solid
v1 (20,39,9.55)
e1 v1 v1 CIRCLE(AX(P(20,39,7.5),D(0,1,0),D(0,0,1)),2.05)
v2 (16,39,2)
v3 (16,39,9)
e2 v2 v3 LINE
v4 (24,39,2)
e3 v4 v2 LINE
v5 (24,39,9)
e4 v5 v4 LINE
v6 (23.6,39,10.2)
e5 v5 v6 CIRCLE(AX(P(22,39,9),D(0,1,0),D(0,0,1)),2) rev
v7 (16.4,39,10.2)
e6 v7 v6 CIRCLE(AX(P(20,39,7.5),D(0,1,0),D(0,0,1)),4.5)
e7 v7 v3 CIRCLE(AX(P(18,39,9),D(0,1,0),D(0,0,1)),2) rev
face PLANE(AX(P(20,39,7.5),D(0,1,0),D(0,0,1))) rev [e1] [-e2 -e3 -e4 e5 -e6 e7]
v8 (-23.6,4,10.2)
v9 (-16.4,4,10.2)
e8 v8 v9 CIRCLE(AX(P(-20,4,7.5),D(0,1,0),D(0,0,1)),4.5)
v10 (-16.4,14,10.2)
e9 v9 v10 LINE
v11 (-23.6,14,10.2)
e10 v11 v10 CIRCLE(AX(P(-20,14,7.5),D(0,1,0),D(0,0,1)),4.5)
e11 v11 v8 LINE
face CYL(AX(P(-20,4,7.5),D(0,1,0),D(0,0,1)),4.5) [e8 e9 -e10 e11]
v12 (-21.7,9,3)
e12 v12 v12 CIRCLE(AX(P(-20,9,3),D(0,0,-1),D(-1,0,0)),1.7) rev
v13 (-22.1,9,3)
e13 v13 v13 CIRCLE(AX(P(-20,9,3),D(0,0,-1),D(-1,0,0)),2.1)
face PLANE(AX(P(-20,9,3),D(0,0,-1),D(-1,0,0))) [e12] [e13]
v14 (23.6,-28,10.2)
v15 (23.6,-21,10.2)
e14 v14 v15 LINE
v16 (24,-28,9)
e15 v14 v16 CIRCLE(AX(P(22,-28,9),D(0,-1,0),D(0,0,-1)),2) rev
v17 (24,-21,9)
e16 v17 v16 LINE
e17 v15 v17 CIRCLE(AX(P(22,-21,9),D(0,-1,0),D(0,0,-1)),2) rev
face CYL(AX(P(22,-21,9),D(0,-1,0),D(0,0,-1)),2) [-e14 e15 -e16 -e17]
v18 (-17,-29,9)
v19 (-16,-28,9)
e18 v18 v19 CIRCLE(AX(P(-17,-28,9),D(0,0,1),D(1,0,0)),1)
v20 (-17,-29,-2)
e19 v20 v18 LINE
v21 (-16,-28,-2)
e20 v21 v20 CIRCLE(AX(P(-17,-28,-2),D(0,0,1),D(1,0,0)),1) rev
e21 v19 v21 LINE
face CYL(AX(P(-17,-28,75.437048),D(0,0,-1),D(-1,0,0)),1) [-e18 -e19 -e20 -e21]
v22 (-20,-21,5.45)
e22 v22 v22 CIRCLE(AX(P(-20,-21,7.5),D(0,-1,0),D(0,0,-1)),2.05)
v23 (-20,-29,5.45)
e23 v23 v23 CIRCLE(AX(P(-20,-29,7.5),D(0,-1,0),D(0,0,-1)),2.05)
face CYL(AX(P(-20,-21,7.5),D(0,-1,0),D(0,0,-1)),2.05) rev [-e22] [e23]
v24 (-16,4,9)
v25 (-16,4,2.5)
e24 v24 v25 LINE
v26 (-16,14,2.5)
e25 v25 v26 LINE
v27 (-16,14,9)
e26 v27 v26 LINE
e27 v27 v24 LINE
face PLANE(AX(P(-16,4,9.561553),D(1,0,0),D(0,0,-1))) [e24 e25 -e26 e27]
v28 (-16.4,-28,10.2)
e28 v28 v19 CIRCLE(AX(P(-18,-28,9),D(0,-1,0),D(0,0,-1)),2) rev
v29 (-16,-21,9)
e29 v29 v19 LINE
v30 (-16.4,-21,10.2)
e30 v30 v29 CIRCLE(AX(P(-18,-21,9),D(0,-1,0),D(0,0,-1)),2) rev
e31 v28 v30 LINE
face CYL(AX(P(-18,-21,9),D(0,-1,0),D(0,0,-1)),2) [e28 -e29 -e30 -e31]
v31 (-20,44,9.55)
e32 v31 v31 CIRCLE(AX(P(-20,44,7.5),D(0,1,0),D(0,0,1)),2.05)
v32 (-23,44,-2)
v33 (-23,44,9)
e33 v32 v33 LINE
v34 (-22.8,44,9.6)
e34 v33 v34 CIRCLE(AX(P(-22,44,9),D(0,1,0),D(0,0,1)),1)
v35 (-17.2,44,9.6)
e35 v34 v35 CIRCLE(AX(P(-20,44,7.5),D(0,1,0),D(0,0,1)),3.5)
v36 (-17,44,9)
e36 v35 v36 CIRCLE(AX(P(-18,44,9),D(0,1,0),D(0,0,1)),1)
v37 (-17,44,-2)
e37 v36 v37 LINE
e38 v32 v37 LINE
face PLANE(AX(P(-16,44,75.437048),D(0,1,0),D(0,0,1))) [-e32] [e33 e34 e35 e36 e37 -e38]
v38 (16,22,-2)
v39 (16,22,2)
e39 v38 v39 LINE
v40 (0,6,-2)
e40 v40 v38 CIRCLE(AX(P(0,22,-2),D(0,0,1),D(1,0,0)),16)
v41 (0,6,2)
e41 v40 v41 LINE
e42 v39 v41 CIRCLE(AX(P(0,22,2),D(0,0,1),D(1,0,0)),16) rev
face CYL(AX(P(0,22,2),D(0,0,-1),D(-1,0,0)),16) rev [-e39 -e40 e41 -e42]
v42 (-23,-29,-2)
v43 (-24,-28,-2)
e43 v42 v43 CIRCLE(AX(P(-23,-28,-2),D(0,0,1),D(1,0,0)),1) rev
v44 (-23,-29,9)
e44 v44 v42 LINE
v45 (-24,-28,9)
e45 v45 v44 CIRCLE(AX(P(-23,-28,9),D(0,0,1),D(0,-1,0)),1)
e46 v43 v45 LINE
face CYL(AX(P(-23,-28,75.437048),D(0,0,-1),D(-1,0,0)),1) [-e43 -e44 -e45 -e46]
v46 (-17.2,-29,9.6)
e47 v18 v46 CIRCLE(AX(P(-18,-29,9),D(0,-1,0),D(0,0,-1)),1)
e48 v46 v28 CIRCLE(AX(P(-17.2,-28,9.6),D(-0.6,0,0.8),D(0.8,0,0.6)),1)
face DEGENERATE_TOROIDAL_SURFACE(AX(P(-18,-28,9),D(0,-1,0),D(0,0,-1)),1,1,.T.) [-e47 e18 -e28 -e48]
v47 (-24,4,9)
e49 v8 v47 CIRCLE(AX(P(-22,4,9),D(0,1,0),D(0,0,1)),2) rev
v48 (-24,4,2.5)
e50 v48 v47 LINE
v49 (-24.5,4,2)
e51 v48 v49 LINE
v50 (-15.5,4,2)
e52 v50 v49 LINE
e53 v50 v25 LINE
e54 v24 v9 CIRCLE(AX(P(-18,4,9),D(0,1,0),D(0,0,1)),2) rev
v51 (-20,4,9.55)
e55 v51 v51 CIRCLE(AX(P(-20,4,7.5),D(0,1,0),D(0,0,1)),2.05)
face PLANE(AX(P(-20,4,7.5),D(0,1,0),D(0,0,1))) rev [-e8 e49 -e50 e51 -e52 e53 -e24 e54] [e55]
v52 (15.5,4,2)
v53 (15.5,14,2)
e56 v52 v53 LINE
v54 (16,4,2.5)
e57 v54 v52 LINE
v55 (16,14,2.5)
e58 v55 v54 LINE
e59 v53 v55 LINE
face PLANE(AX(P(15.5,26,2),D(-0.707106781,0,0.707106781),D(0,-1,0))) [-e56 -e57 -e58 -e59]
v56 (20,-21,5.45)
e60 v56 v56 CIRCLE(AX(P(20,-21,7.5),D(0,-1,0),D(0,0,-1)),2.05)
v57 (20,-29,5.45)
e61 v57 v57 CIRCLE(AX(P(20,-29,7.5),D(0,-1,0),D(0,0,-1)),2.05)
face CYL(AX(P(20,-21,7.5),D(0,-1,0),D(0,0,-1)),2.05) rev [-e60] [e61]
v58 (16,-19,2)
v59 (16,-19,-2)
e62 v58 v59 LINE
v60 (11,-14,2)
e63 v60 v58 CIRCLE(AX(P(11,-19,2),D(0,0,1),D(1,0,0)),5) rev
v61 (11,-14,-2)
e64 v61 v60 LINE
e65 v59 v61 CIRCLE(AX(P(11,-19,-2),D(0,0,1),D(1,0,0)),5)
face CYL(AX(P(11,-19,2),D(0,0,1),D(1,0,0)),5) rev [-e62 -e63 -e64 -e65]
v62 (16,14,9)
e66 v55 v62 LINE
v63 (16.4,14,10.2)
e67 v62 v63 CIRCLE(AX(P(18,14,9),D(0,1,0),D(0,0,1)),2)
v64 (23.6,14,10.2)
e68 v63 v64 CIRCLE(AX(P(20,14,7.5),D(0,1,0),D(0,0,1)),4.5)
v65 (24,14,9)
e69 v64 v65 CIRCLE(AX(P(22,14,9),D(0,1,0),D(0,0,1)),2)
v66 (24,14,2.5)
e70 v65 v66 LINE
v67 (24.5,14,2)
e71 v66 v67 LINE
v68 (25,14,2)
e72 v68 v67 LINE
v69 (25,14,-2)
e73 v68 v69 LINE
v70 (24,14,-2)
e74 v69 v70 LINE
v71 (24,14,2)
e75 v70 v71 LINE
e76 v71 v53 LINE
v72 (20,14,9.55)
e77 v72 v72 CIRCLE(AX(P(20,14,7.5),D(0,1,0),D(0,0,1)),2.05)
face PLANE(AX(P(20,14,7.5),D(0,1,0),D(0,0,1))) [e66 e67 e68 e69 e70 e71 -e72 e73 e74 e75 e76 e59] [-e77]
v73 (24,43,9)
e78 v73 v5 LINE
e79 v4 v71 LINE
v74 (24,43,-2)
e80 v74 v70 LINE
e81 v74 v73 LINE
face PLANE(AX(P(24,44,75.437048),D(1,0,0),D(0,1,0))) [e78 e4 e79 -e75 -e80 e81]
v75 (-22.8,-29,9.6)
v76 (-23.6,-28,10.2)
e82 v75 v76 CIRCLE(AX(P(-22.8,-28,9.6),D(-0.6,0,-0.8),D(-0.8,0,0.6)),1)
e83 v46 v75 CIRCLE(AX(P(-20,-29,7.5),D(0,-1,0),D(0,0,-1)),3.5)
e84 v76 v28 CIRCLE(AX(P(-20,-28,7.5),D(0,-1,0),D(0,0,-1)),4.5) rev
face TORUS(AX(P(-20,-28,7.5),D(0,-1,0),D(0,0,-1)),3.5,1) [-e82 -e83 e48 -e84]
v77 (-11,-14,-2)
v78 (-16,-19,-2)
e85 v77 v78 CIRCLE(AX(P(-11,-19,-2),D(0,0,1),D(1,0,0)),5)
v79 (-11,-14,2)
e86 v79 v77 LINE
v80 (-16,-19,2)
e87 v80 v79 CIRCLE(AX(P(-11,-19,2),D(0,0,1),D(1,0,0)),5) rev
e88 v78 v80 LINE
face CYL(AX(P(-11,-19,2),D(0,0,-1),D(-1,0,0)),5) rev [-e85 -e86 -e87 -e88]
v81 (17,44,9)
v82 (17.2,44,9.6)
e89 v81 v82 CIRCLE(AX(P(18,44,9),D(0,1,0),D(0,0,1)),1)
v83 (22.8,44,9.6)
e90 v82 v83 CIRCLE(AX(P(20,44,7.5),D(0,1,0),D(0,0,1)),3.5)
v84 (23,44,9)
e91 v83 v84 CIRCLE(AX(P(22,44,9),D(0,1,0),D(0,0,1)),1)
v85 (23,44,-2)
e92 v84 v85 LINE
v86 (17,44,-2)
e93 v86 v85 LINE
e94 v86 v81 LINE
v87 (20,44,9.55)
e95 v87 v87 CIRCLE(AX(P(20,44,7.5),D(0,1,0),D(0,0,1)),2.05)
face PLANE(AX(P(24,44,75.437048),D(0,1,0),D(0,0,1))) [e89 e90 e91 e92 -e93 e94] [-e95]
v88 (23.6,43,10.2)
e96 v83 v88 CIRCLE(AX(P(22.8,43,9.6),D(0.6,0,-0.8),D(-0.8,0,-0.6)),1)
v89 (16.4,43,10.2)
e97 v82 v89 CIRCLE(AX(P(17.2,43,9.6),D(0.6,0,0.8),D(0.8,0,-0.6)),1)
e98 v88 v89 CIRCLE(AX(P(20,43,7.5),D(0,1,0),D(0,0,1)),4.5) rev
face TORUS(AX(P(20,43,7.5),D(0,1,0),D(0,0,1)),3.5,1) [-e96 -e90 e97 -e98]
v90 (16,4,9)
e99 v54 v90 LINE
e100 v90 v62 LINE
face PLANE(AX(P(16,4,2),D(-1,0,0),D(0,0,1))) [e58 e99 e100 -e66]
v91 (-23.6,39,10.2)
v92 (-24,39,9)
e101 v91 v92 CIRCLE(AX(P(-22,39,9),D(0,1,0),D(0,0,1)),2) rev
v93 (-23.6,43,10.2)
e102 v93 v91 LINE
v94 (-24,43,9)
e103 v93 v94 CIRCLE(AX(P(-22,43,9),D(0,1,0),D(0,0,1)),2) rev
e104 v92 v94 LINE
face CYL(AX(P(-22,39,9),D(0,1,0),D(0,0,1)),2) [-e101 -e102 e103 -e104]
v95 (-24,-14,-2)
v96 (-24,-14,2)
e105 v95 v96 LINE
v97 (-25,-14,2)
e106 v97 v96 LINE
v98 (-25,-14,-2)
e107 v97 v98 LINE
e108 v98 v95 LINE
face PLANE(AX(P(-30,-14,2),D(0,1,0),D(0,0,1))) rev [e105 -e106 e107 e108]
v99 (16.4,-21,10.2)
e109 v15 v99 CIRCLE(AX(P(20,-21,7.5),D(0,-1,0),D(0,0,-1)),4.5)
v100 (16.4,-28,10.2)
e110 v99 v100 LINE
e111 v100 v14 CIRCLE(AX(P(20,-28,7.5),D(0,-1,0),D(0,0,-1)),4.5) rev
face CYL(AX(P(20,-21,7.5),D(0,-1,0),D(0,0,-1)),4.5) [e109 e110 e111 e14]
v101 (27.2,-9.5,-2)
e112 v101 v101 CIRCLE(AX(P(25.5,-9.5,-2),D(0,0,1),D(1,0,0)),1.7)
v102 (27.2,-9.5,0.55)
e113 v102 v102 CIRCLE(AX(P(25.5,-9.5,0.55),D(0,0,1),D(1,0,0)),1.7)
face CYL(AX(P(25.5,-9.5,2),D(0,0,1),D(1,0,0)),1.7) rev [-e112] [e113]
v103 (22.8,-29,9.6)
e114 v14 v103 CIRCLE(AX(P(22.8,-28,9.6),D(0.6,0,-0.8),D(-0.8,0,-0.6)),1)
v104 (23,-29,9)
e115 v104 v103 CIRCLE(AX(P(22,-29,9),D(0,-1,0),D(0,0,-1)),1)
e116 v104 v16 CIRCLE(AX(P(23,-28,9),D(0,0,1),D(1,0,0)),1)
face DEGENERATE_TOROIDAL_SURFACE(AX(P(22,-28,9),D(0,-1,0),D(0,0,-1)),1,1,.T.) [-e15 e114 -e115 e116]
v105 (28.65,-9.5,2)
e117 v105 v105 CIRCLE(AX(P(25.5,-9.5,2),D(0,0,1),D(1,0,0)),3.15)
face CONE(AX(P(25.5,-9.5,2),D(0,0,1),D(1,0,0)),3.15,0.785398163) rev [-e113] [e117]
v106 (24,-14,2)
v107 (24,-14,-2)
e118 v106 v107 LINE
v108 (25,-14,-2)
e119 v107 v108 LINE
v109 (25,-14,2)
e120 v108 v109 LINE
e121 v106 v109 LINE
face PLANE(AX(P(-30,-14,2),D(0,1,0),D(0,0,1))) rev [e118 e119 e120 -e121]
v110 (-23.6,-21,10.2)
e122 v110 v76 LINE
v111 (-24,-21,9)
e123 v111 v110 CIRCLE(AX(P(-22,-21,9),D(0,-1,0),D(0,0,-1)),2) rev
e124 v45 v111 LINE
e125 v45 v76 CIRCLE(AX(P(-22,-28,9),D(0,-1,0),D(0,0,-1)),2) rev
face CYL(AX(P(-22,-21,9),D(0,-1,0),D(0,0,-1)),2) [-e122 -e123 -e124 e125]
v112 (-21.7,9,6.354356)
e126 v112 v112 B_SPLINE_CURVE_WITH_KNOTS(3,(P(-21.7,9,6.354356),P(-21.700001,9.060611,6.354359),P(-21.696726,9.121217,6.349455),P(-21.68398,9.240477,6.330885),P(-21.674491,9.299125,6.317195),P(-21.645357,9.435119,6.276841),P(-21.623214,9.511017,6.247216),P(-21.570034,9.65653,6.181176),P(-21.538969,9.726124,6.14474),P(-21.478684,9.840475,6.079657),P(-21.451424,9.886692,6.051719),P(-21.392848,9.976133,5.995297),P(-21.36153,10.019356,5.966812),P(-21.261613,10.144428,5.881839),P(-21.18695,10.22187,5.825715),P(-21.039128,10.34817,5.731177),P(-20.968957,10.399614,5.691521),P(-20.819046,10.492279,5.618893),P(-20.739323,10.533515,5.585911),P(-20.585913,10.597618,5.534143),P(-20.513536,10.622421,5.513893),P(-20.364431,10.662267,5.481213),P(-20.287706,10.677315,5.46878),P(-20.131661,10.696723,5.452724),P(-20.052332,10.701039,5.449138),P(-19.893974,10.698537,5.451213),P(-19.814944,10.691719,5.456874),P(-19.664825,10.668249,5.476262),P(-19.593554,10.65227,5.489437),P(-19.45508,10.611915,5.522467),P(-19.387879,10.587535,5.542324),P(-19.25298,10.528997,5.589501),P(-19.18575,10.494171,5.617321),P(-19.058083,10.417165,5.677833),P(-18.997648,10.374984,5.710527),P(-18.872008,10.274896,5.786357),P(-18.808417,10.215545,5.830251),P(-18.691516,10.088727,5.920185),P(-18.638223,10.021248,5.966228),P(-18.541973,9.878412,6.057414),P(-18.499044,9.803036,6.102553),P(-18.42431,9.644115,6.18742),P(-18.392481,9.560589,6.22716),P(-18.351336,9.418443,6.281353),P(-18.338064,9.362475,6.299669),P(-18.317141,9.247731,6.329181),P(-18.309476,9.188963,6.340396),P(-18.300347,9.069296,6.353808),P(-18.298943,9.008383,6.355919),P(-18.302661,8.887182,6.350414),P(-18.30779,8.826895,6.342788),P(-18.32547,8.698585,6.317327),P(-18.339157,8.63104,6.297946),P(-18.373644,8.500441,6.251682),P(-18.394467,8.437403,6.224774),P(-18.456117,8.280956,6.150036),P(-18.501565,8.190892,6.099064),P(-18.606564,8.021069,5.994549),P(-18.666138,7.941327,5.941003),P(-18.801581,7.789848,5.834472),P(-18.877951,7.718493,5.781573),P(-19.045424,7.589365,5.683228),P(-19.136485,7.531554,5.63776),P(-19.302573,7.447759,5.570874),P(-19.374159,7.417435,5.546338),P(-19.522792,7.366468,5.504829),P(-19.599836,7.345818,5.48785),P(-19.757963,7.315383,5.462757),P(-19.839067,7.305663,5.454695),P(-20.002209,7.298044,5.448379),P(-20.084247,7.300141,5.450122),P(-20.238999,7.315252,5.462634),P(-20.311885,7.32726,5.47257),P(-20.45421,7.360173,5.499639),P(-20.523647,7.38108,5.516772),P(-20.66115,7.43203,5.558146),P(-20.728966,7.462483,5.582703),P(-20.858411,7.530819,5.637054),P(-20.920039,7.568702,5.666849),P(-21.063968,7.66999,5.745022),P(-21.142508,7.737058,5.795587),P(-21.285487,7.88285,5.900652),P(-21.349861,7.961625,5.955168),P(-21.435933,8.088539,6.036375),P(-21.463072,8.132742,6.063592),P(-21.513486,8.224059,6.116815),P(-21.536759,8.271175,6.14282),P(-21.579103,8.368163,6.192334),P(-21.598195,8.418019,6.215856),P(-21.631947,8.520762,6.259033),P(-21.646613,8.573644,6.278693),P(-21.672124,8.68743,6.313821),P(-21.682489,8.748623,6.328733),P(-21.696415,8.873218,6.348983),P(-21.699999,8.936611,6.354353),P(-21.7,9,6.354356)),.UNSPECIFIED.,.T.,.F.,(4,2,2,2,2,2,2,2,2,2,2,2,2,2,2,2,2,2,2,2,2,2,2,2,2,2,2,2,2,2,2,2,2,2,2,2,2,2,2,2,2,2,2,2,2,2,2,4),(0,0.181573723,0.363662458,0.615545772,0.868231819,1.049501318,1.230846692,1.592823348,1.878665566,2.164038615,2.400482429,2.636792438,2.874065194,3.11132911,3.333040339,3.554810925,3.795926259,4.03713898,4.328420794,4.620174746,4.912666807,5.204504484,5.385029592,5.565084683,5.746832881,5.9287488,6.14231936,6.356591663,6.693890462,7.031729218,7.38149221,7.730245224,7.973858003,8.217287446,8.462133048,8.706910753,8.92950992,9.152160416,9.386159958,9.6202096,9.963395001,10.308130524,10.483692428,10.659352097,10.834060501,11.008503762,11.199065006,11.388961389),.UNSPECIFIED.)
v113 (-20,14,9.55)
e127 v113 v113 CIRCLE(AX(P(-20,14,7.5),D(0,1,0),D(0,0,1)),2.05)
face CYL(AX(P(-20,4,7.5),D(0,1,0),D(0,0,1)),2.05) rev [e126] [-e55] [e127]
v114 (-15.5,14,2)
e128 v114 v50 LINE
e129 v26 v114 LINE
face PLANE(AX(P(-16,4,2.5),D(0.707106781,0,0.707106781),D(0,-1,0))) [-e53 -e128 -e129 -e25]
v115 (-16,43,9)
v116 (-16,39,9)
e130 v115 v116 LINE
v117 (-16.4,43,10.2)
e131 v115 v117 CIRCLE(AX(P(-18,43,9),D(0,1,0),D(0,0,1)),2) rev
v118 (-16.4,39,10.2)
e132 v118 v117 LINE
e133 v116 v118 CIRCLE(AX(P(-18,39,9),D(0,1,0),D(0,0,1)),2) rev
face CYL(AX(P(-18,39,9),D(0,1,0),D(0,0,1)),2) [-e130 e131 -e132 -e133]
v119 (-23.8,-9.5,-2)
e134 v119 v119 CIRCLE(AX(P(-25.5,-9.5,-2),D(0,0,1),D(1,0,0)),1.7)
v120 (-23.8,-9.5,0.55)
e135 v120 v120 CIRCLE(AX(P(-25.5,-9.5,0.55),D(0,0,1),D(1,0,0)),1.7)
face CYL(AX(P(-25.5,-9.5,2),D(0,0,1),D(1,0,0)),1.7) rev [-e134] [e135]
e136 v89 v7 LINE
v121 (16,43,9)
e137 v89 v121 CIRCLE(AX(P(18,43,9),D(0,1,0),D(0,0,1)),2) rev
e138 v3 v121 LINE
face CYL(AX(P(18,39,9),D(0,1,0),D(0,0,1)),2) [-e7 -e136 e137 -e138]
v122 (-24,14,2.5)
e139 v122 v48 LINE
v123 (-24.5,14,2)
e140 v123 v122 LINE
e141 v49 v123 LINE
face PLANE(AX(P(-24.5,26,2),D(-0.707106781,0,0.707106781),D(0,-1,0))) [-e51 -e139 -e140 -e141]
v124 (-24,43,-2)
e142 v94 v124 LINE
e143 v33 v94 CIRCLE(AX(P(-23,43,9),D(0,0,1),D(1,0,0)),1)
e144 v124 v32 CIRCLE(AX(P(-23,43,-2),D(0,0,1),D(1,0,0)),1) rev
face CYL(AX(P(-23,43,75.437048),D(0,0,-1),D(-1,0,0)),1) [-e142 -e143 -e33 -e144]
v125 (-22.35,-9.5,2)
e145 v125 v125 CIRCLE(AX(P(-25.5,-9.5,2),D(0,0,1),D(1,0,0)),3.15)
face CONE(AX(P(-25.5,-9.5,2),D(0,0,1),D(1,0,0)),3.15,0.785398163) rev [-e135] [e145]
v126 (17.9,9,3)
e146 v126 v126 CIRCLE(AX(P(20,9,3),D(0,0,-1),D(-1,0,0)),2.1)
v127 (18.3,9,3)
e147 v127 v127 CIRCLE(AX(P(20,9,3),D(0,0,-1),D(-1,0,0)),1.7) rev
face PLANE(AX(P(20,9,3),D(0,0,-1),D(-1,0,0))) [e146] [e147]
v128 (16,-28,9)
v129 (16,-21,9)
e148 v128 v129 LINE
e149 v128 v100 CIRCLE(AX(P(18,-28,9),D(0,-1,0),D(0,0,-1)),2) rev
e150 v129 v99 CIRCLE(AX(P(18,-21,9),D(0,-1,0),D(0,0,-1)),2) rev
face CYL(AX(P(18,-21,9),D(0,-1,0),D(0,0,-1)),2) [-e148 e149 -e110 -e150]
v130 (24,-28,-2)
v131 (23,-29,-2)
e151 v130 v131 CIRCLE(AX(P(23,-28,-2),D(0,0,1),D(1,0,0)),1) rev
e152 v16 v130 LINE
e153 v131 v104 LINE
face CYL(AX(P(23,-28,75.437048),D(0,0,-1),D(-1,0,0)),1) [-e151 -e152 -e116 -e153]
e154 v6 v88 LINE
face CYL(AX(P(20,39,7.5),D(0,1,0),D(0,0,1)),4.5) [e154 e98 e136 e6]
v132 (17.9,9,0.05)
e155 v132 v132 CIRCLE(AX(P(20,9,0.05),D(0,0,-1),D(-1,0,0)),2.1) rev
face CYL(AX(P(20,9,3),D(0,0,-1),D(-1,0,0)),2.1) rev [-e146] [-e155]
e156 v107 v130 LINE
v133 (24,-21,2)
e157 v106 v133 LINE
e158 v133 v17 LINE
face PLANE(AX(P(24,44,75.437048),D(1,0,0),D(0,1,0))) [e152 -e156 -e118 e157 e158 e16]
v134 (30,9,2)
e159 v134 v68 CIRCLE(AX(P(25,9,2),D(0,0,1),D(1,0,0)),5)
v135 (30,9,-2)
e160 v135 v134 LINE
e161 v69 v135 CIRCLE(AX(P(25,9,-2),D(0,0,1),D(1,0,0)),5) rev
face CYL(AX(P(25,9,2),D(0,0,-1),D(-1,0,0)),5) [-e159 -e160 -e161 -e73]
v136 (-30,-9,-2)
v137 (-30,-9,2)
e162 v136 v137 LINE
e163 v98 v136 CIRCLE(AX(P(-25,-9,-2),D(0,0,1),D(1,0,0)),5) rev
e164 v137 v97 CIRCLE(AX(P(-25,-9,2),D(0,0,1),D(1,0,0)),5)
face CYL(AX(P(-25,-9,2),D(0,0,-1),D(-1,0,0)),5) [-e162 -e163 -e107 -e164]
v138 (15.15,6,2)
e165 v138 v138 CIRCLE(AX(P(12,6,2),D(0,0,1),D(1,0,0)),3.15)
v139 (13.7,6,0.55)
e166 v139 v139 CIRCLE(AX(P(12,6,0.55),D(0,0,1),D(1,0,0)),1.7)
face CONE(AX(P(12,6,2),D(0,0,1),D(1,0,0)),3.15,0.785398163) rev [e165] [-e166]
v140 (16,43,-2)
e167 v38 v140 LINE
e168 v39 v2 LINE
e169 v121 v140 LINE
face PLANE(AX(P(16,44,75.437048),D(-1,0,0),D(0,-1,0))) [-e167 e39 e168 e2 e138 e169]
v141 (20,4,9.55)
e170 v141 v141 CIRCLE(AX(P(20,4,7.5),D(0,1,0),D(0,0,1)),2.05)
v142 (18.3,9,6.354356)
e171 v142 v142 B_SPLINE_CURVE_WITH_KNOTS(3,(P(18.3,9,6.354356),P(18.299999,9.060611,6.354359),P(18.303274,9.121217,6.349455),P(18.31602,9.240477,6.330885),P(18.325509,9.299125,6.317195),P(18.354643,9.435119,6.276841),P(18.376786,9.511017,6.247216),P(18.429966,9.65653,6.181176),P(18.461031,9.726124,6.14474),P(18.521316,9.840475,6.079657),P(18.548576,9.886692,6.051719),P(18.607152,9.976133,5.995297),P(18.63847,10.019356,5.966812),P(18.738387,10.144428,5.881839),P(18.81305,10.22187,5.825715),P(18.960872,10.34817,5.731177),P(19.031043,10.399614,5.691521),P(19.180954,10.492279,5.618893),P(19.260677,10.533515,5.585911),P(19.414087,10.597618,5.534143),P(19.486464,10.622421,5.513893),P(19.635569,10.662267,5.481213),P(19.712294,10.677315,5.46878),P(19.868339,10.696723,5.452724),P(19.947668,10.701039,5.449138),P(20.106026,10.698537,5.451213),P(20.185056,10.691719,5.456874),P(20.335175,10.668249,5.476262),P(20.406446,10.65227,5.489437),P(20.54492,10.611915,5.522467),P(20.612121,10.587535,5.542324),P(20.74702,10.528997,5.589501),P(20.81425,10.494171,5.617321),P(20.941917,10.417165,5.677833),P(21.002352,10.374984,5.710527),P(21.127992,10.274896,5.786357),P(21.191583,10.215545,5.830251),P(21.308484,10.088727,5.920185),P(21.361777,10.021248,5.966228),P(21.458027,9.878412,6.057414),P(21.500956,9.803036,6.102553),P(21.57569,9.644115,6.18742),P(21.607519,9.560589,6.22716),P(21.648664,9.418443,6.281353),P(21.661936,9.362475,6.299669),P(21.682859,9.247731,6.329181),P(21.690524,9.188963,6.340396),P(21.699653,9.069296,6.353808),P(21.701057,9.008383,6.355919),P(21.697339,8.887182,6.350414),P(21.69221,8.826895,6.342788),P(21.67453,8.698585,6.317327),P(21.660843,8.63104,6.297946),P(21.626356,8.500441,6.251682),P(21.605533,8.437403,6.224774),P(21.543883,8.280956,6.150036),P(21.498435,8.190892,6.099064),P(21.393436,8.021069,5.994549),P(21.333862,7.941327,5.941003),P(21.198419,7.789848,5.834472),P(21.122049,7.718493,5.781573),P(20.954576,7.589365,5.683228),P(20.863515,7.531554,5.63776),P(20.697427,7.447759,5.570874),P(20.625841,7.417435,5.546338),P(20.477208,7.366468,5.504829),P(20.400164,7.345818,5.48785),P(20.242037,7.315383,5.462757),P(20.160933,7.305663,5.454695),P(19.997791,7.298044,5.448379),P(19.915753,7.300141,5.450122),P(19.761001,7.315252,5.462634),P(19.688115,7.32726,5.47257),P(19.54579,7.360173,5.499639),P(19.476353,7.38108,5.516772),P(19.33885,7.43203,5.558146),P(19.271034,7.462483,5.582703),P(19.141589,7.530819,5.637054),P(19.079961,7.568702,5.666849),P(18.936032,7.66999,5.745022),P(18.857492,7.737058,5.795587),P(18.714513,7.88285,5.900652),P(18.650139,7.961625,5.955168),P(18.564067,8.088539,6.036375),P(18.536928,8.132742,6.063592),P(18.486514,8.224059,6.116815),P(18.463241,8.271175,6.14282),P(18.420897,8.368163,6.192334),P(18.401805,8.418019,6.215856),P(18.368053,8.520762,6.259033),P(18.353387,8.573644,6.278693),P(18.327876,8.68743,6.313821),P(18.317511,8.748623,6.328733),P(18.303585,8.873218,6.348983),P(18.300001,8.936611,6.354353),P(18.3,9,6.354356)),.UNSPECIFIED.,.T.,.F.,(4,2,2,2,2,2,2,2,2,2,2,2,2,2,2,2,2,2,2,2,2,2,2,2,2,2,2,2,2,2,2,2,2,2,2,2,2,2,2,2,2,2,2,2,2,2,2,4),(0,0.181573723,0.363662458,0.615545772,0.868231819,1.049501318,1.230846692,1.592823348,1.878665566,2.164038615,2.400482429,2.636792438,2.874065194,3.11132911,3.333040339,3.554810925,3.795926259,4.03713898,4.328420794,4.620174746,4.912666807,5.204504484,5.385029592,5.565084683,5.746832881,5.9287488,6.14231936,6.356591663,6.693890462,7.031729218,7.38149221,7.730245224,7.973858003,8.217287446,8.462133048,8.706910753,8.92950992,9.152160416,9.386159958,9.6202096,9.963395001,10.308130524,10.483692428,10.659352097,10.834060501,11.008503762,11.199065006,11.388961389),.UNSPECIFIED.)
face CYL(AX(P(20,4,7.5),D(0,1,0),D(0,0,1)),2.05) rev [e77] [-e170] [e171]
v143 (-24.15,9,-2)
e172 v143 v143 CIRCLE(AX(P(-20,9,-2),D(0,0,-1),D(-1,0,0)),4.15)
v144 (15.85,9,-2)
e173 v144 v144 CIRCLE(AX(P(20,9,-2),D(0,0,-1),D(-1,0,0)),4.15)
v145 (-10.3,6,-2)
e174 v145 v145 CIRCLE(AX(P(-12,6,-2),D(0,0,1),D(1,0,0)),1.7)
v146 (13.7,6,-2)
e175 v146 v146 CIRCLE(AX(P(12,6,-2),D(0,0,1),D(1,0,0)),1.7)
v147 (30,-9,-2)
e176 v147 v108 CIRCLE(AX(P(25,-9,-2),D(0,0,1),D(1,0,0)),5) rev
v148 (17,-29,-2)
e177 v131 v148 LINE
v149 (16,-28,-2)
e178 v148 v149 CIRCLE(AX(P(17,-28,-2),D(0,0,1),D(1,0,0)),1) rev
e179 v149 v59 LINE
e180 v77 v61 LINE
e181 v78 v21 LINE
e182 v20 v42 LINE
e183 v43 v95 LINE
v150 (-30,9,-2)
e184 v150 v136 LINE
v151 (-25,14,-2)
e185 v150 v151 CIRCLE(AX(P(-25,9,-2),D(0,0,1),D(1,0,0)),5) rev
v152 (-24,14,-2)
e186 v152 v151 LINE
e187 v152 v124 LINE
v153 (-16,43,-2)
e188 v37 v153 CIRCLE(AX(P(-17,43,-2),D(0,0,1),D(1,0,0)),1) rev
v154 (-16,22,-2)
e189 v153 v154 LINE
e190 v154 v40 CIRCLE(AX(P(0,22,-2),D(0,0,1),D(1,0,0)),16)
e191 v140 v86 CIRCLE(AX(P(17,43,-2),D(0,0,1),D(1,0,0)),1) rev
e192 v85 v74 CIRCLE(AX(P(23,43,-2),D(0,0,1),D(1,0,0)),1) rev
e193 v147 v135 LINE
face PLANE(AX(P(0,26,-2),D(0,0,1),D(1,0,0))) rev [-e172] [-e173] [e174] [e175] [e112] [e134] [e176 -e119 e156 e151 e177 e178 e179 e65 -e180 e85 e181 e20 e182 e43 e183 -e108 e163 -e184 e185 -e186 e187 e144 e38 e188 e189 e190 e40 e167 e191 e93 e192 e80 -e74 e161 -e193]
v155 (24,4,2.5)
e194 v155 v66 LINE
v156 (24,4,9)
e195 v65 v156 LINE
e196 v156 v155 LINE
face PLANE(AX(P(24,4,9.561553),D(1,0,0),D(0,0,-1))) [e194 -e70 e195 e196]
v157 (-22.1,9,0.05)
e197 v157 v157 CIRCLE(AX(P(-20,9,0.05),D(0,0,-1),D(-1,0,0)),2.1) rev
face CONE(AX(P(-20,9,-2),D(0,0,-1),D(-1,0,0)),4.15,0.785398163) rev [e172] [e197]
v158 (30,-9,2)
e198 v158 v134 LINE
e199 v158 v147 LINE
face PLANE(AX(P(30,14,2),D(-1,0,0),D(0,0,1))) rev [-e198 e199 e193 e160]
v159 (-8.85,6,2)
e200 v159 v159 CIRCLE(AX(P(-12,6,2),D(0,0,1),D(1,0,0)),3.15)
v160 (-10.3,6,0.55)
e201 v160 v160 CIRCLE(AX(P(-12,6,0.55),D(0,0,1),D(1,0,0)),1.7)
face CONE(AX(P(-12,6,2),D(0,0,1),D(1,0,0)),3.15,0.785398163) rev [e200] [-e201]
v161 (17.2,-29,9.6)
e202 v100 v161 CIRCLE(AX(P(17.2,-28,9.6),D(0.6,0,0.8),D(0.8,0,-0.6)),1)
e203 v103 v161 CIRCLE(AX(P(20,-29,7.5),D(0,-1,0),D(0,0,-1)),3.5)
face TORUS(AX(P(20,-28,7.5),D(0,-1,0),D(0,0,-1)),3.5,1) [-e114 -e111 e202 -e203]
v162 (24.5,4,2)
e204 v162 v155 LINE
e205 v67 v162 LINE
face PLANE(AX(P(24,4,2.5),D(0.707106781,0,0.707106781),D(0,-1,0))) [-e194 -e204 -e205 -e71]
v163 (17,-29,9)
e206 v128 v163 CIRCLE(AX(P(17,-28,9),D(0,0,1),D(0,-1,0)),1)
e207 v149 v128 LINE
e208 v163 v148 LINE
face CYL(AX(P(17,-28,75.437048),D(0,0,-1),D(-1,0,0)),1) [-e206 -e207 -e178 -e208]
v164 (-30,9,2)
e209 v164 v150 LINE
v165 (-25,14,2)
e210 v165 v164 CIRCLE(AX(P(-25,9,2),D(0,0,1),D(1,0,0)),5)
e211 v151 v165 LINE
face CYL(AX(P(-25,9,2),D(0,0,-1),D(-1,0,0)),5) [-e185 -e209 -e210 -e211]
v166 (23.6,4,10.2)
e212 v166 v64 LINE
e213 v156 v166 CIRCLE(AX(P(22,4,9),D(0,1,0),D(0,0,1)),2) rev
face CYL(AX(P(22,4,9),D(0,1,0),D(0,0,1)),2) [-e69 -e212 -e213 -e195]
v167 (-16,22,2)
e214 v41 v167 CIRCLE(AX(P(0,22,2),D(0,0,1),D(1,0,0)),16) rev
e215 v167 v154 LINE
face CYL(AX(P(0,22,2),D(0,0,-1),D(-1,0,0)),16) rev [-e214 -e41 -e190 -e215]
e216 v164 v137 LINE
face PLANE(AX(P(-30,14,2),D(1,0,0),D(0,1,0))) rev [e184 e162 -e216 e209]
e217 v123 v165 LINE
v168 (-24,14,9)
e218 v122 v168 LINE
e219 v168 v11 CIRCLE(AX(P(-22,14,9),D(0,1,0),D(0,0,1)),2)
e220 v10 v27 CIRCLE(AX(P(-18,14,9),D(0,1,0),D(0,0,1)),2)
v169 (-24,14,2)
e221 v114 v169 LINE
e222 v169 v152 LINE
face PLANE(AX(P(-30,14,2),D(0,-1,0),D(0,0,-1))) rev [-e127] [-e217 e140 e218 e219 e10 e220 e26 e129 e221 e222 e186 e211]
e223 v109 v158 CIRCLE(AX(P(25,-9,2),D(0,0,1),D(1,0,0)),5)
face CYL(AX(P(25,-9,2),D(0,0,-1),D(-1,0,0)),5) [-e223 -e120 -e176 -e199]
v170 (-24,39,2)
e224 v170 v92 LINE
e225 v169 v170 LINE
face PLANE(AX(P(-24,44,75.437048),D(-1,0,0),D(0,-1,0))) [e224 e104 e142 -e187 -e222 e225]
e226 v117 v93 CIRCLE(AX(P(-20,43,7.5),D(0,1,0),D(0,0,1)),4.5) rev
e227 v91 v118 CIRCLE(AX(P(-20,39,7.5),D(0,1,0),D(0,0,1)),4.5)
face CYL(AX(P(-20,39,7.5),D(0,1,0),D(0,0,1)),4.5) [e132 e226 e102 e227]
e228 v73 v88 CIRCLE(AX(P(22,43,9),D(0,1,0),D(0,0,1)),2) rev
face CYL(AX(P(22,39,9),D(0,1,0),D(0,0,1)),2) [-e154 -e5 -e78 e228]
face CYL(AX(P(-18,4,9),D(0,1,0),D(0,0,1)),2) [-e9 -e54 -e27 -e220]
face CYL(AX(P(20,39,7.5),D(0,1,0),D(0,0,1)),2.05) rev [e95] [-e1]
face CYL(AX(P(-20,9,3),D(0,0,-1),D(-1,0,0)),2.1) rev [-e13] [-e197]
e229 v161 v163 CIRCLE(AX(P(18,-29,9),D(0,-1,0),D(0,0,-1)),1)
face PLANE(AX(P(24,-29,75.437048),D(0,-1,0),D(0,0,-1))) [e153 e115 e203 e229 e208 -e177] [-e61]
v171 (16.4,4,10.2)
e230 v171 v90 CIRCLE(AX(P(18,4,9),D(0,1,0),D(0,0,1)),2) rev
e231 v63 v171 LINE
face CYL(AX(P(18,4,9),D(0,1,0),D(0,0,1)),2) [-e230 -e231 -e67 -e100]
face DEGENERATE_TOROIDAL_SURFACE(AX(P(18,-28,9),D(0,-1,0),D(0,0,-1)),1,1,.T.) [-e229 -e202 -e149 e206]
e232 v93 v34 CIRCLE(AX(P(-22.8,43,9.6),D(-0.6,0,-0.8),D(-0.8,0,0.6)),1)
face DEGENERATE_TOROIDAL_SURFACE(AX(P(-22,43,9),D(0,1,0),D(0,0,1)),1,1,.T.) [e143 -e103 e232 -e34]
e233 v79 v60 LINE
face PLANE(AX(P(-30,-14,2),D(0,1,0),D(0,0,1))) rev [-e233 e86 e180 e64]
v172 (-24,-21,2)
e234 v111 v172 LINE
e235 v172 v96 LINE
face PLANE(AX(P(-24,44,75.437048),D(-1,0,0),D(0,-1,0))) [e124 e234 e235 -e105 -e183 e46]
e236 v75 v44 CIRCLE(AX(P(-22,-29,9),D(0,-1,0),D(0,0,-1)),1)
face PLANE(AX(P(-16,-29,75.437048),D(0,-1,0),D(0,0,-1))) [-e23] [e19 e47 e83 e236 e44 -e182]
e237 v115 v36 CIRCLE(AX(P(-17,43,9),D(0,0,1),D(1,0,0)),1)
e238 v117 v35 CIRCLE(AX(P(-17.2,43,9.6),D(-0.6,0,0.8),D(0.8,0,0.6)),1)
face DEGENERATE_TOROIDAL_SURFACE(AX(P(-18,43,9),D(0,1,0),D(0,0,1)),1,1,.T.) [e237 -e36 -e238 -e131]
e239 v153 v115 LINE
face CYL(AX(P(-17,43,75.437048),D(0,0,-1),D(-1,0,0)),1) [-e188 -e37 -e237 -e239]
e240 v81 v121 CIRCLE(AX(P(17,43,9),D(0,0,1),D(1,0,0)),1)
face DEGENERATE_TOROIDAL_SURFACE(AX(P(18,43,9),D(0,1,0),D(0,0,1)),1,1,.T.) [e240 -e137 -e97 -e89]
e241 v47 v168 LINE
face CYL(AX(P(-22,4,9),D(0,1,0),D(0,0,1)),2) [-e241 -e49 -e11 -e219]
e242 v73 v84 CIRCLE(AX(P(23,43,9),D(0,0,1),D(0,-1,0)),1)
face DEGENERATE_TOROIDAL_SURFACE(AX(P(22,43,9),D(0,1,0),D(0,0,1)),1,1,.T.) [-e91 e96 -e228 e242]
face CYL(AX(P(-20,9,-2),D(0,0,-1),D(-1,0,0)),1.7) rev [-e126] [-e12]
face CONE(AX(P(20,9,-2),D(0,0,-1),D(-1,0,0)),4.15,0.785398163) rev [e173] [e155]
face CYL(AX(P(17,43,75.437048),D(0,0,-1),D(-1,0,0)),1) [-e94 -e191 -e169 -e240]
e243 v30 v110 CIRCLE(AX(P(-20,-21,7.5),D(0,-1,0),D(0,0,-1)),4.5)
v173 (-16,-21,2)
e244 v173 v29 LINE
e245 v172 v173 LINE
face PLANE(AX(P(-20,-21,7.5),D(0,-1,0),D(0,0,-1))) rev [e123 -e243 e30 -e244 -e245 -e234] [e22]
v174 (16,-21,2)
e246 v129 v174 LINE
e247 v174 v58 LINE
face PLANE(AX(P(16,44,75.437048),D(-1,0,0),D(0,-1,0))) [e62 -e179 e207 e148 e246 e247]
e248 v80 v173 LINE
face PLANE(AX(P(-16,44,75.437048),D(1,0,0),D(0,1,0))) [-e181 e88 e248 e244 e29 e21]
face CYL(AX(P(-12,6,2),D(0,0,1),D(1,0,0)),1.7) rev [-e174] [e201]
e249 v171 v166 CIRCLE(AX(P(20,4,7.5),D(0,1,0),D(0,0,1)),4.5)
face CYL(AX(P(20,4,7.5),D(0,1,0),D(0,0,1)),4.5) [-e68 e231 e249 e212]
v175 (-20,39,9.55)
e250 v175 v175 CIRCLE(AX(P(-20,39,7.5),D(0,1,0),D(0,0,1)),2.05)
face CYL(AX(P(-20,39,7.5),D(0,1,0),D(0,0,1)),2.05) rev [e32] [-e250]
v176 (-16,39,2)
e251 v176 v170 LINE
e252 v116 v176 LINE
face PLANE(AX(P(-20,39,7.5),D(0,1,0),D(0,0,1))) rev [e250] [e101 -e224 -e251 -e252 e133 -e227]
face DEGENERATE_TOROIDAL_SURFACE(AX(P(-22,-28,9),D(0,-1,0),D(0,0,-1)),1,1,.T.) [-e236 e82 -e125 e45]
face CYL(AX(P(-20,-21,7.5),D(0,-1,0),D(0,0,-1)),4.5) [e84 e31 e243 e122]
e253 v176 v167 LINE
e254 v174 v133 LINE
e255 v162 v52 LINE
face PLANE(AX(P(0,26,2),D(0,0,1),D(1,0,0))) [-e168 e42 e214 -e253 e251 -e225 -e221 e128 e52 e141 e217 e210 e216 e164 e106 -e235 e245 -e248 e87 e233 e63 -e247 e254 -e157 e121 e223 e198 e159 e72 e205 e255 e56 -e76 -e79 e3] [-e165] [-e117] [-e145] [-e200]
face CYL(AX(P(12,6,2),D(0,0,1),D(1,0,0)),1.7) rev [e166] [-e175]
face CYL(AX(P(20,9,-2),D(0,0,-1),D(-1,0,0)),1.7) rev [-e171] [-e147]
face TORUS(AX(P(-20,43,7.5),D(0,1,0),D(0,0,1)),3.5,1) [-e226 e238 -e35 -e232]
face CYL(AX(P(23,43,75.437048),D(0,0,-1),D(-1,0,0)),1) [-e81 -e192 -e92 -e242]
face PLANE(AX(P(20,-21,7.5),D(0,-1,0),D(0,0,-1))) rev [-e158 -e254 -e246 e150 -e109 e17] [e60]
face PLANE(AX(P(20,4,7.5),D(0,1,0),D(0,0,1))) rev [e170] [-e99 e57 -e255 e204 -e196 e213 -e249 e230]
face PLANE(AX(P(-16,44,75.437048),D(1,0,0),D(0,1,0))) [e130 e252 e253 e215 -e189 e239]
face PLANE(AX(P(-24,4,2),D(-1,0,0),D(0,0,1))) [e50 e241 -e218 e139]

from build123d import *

# Parameters (mm, degrees)
BOSS_EXTRUDE1_DEPTH                                 = 2
SKETCH2_W                                           = 8
SKETCH2_H                                           = 73
BOSS_EXTRUDE2_DEPTH                                 = 4
CSK_FOR_M3_FLAT_COUNTERSUNK_HEAD_SCREW1_D           = 3.4
CSK_FOR_M3_FLAT_COUNTERSUNK_HEAD_SCREW1_DEPTH       = 10
CSK_FOR_M3_FLAT_COUNTERSUNK_HEAD_SCREW1_CSINK_D     = 6.3
CSK_FOR_M3_FLAT_COUNTERSUNK_HEAD_SCREW1_CSINK_ANGLE = 90
CSK_FOR_M3_FLAT_COUNTERSUNK_HEAD_SCREW1_TIP         = 1.021463052
SKETCH5_R                                           = 2.05
BOSS_EXTRUDE3_DEPTH                                 = 8
BOSS_EXTRUDE4_START                                 = -10
SKETCH6_R                                           = 2.05
BOSS_EXTRUDE4_DEPTH                                 = 10
BOSS_EXTRUDE5_START                                 = -5
SKETCH7_R                                           = 2.05
BOSS_EXTRUDE5_DEPTH                                 = 5
SKETCH13_R                                          = 2.1
CUT_EXTRUDE1_DEPTH                                  = 5
FILLET1_R                                           = 5
FILLET2_R                                           = 16
FILLET3_R                                           = 2
FILLET4_R                                           = 1
CHAMFER1_SIZE                                       = 0.5


# Read off the part's stored shape, not the designer's step: CSK for M3 Flat Countersunk Head Screw2
with BuildPart() as part:
    # Sketch1 → Boss-Extrude1 (new, symmetric)
    with BuildSketch(Plane.XY):
        with BuildLine():
            Line((-30, 14), (-16, 14))
            ThreePointArc((-16, 14), (0, 6), (16, 14))
            Line((16, 14), (30, 14))
            Line((30, 14), (30, -14))
            Line((30, -14), (-30, -14))
            Line((-30, -14), (-30, 14))
        make_face()
    extrude(amount=BOSS_EXTRUDE1_DEPTH, both=True)

    # Sketch2 → Boss-Extrude2 (add)
    with BuildSketch(Plane(origin=(0, 0, -2), x_dir=(-1, 0, 0), z_dir=(0, 0, -1))):
        with Locations((-20, 7.5)):
            Rectangle(SKETCH2_W, SKETCH2_H)
        with Locations((20, 7.5)):
            Rectangle(SKETCH2_W, SKETCH2_H)
    extrude(amount=-BOSS_EXTRUDE2_DEPTH)

    # CSK for M3 Flat Countersunk Head Screw1
    with Locations(Plane.XY.offset(2)):
        with Locations((25.5, -9.5), (-25.5, -9.5), (-12, 6), (12, 6)):
            CounterSinkHole(CSK_FOR_M3_FLAT_COUNTERSUNK_HEAD_SCREW1_D / 2, CSK_FOR_M3_FLAT_COUNTERSUNK_HEAD_SCREW1_CSINK_D / 2, depth=CSK_FOR_M3_FLAT_COUNTERSUNK_HEAD_SCREW1_DEPTH, counter_sink_angle=CSK_FOR_M3_FLAT_COUNTERSUNK_HEAD_SCREW1_CSINK_ANGLE)
            with Locations((0, 0, -(CSK_FOR_M3_FLAT_COUNTERSUNK_HEAD_SCREW1_DEPTH + CSK_FOR_M3_FLAT_COUNTERSUNK_HEAD_SCREW1_TIP / 2))):  # 118° drill point
                Cone(0, CSK_FOR_M3_FLAT_COUNTERSUNK_HEAD_SCREW1_D / 2, CSK_FOR_M3_FLAT_COUNTERSUNK_HEAD_SCREW1_TIP, mode=Mode.SUBTRACT)

    # Sketch5 → Boss-Extrude3 (add)
    # profile 1 of 2: a face of its own
    with BuildSketch(Plane(origin=(0, -29, 0), x_dir=(-1, 0, 0), z_dir=(0, -1, 0))):
        with BuildLine():
            Line((24, -2), (24, -9.561552813))
            ThreePointArc((24, -9.561552813), (20, -12), (16, -9.561552813))
            Line((16, -9.561552813), (16, -2))
            Line((16, -2), (24, -2))
        make_face()
        with Locations(Location((20, -7.5, 0), (0, 0, 90))):
            Circle(SKETCH5_R, mode=Mode.SUBTRACT)
    # profile 2 of 2: a face of its own
    with BuildSketch(Plane(origin=(0, -29, 0), x_dir=(-1, 0, 0), z_dir=(0, -1, 0))):
        with BuildLine():
            Line((-16, -9.561552813), (-16, -2))
            Line((-16, -2), (-24, -2))
            Line((-24, -2), (-24, -9.561552813))
            ThreePointArc((-24, -9.561552813), (-20, -12), (-16, -9.561552813))
        make_face()
        with Locations(Location((-20, -7.5, 0), (0, 0, 90))):
            Circle(SKETCH5_R, mode=Mode.SUBTRACT)
    extrude(amount=-BOSS_EXTRUDE3_DEPTH)

    # Sketch6 → Boss-Extrude4 (add)
    # profile 1 of 2: a face of its own
    with BuildSketch(Plane(origin=(0, 14, 0), x_dir=(1, 0, 0), z_dir=(0, 1, 0)).offset(BOSS_EXTRUDE4_START)):
        with BuildLine():
            Line((24, -2), (16, -2))
            Line((16, -2), (16, -9.561552813))
            ThreePointArc((16, -9.561552813), (20, -12), (24, -9.561552813))
            Line((24, -9.561552813), (24, -2))
        make_face()
        with Locations(Location((20, -7.5, 0), (0, 0, 90))):
            Circle(SKETCH6_R, mode=Mode.SUBTRACT)
    # profile 2 of 2: a face of its own
    with BuildSketch(Plane(origin=(0, 14, 0), x_dir=(1, 0, 0), z_dir=(0, 1, 0)).offset(BOSS_EXTRUDE4_START)):
        with BuildLine():
            Line((-24, -2), (-24, -9.561552813))
            ThreePointArc((-24, -9.561552813), (-20, -12), (-16, -9.561552813))
            Line((-16, -9.561552813), (-16, -2))
            Line((-16, -2), (-24, -2))
        make_face()
        with Locations(Location((-20, -7.5, 0), (0, 0, 90))):
            Circle(SKETCH6_R, mode=Mode.SUBTRACT)
    extrude(amount=BOSS_EXTRUDE4_DEPTH)

    # Sketch7 → Boss-Extrude5 (add)
    # profile 1 of 2: a face of its own
    with BuildSketch(Plane(origin=(0, 44, 0), x_dir=(1, 0, 0), z_dir=(0, 1, 0)).offset(BOSS_EXTRUDE5_START)):
        with BuildLine():
            Line((24, -2), (16, -2))
            Line((16, -2), (16, -9.561552813))
            ThreePointArc((16, -9.561552813), (20, -12), (24, -9.561552813))
            Line((24, -9.561552813), (24, -2))
        make_face()
        with Locations(Location((20, -7.5, 0), (0, 0, 90))):
            Circle(SKETCH7_R, mode=Mode.SUBTRACT)
    # profile 2 of 2: a face of its own
    with BuildSketch(Plane(origin=(0, 44, 0), x_dir=(1, 0, 0), z_dir=(0, 1, 0)).offset(BOSS_EXTRUDE5_START)):
        with BuildLine():
            Line((-24, -2), (-24, -9.561552813))
            ThreePointArc((-24, -9.561552813), (-20, -12), (-16, -9.561552813))
            Line((-16, -9.561552813), (-16, -2))
            Line((-16, -2), (-24, -2))
        make_face()
        with Locations(Location((-20, -7.5, 0), (0, 0, 90))):
            Circle(SKETCH7_R, mode=Mode.SUBTRACT)
    extrude(amount=BOSS_EXTRUDE5_DEPTH)

    # CSK for M3 Flat Countersunk Head Scr 2 → CSK for M3 Flat Countersunk Head Screw2 (revolve, cut)
    with BuildSketch(Plane(origin=(-20, 9, 0), x_dir=(1, 0, 0), z_dir=(0, -1, 0))):
        Polygon((1.7, 0.45), (1.7, 6.354821537), (0, 6.354821537), (0, -2), (4.15, -2), align=None)
    revolve(axis=Axis((-20, 9, 0), (0, 0, 1)), mode=Mode.SUBTRACT)

    # CSK for M3 Flat Countersunk Head Scr 3 o → CSK for M3 Flat Countersunk Head Scr 3 (revolve, cut)
    with BuildSketch(Plane(origin=(20, 9, 0), x_dir=(1, 0, 0), z_dir=(0, -1, 0))):
        Polygon((1.7, 0.45), (1.7, 6.354821537), (0, 6.354821537), (0, -2), (4.15, -2), align=None)
    revolve(axis=Axis((20, 9, 0), (0, 0, 1)), mode=Mode.SUBTRACT)

    # Sketch13 → Cut-Extrude1 (cut)
    with BuildSketch(Plane(origin=(0, 0, -2), x_dir=(-1, 0, 0), z_dir=(0, 0, -1))):
        with Locations((-20, 9)):
            Circle(SKETCH13_R)
        with Locations((20, 9)):
            Circle(SKETCH13_R)
    extrude(amount=-CUT_EXTRUDE1_DEPTH, mode=Mode.SUBTRACT)

    # Fillet1
    fillet1_edges = [part.edges().sort_by_distance(p)[0] for p in [
        (-30, 14, 0),
        (30, 14, 0),
        (30, -14, 0),
        (-30, -14, 0),
        (16, -14, 0),
        (-16, -14, 0),
    ]]
    fillet(fillet1_edges, radius=FILLET1_R)

    # Fillet2
    # the kernel refuses this fillet: 16 mm, written as the material it adds along each edge
    with BuildSketch(Plane(origin=(16, 14, 2), x_dir=(-0.894427190999915, -0.4472135954999595, 0), z_dir=(0, 0, -1))) as fillet2_piece_1:
        with BuildLine():
            CenterArc((10.733126292, 14.310835056), FILLET2_R, 206.565051177, 90)
            Line((-3.577708764, 7.155417528), (0, 0))
            ThreePointArc((0, 0), (8.94427191, -2.11145618), (17.88854382, 0))
        make_face()
    extrude(amount=4)
    with BuildSketch(Plane(origin=(-16, 14, 2), x_dir=(0.8944271909999153, -0.4472135954999591, 0), z_dir=(0, 0, -1))) as fillet2_piece_2:
        with BuildLine():
            CenterArc((10.733126292, -14.310835056), FILLET2_R, 63.434948823, 90)
            Line((-3.577708764, -7.155417528), (0, 0))
            ThreePointArc((0, 0), (8.94427191, 2.11145618), (17.88854382, 0))
        make_face()
    extrude(amount=4)

    # Fillet3
    fillet3_edges = [part.edges().sort_by_distance(p)[0] for p in [
        (-24, -25, 9.561552813),
        (-16, -25, 9.561552813),
        (16, -25, 9.561552813),
        (24, -25, 9.561552813),
        (16, 9, 9.561552813),
        (24, 9, 9.561552813),
        (-16, 9, 9.561552813),
        (-24, 9, 9.561552813),
        (16, 41.5, 9.561552813),
        (24, 41.5, 9.561552813),
        (-16, 41.5, 9.561552813),
        (-24, 41.5, 9.561552813),
    ]]
    fillet(fillet3_edges, radius=FILLET3_R)

    # Fillet4
    fillet4_edges = [part.edges().sort_by_distance(p)[0] for p in [
        (-24, 44, 3.5),
        (-20, 44, 12),
        (-16, 44, 3.5),
        (-16.102633404, 44, 9.632455532),
        (-23.897366596, 44, 9.632455532),
        (20, 44, 12),
        (16, 44, 3.5),
        (24, 44, 3.5),
        (16.102633404, 44, 9.632455532),
        (23.897366596, 44, 9.632455532),
        (-20, -29, 12),
        (-16, -29, 3.5),
        (-24, -29, 3.5),
        (-16.102633404, -29, 9.632455532),
        (-23.897366596, -29, 9.632455532),
        (20, -29, 12),
        (24, -29, 3.5),
        (16, -29, 3.5),
        (23.897366596, -29, 9.632455532),
        (16.102633404, -29, 9.632455532),
    ]]
    fillet(fillet4_edges, radius=FILLET4_R)

    # Chamfer1
    # the kernel refuses this chamfer: 0.5 mm, written as the material it adds along each edge
    with BuildSketch(Plane(origin=(16, 4, 2), x_dir=(-0.9996219169112968, 0, -0.02749587661058516), z_dir=(0, 1, 0)), Plane(origin=(-24, 4, 2), x_dir=(-0.9996219169112968, 0, -0.02749587661058968), z_dir=(0, 1, 0))) as chamfer1_piece_1:
        Polygon((CHAMFER1_SIZE * 0.999621916911, CHAMFER1_SIZE * 0.0274958766106), (-CHAMFER1_SIZE * 0.0274958766106, CHAMFER1_SIZE * 0.999621916911), (0, 0), align=None)
    extrude(amount=10)
    with BuildSketch(Plane(origin=(24, 4, 2), x_dir=(0.9996219169112968, 0, -0.027495876610585602), z_dir=(0, 1, 0)), Plane(origin=(-16, 4, 2), x_dir=(0.9996219169112968, 0, -0.027495876610590154), z_dir=(0, 1, 0))) as chamfer1_piece_2:
        Polygon((CHAMFER1_SIZE * 0.999621916911, -CHAMFER1_SIZE * 0.0274958766106), (-CHAMFER1_SIZE * 0.0274958766106, -CHAMFER1_SIZE * 0.999621916911), (0, 0), align=None)
    extrude(amount=10)


solid = part.part
